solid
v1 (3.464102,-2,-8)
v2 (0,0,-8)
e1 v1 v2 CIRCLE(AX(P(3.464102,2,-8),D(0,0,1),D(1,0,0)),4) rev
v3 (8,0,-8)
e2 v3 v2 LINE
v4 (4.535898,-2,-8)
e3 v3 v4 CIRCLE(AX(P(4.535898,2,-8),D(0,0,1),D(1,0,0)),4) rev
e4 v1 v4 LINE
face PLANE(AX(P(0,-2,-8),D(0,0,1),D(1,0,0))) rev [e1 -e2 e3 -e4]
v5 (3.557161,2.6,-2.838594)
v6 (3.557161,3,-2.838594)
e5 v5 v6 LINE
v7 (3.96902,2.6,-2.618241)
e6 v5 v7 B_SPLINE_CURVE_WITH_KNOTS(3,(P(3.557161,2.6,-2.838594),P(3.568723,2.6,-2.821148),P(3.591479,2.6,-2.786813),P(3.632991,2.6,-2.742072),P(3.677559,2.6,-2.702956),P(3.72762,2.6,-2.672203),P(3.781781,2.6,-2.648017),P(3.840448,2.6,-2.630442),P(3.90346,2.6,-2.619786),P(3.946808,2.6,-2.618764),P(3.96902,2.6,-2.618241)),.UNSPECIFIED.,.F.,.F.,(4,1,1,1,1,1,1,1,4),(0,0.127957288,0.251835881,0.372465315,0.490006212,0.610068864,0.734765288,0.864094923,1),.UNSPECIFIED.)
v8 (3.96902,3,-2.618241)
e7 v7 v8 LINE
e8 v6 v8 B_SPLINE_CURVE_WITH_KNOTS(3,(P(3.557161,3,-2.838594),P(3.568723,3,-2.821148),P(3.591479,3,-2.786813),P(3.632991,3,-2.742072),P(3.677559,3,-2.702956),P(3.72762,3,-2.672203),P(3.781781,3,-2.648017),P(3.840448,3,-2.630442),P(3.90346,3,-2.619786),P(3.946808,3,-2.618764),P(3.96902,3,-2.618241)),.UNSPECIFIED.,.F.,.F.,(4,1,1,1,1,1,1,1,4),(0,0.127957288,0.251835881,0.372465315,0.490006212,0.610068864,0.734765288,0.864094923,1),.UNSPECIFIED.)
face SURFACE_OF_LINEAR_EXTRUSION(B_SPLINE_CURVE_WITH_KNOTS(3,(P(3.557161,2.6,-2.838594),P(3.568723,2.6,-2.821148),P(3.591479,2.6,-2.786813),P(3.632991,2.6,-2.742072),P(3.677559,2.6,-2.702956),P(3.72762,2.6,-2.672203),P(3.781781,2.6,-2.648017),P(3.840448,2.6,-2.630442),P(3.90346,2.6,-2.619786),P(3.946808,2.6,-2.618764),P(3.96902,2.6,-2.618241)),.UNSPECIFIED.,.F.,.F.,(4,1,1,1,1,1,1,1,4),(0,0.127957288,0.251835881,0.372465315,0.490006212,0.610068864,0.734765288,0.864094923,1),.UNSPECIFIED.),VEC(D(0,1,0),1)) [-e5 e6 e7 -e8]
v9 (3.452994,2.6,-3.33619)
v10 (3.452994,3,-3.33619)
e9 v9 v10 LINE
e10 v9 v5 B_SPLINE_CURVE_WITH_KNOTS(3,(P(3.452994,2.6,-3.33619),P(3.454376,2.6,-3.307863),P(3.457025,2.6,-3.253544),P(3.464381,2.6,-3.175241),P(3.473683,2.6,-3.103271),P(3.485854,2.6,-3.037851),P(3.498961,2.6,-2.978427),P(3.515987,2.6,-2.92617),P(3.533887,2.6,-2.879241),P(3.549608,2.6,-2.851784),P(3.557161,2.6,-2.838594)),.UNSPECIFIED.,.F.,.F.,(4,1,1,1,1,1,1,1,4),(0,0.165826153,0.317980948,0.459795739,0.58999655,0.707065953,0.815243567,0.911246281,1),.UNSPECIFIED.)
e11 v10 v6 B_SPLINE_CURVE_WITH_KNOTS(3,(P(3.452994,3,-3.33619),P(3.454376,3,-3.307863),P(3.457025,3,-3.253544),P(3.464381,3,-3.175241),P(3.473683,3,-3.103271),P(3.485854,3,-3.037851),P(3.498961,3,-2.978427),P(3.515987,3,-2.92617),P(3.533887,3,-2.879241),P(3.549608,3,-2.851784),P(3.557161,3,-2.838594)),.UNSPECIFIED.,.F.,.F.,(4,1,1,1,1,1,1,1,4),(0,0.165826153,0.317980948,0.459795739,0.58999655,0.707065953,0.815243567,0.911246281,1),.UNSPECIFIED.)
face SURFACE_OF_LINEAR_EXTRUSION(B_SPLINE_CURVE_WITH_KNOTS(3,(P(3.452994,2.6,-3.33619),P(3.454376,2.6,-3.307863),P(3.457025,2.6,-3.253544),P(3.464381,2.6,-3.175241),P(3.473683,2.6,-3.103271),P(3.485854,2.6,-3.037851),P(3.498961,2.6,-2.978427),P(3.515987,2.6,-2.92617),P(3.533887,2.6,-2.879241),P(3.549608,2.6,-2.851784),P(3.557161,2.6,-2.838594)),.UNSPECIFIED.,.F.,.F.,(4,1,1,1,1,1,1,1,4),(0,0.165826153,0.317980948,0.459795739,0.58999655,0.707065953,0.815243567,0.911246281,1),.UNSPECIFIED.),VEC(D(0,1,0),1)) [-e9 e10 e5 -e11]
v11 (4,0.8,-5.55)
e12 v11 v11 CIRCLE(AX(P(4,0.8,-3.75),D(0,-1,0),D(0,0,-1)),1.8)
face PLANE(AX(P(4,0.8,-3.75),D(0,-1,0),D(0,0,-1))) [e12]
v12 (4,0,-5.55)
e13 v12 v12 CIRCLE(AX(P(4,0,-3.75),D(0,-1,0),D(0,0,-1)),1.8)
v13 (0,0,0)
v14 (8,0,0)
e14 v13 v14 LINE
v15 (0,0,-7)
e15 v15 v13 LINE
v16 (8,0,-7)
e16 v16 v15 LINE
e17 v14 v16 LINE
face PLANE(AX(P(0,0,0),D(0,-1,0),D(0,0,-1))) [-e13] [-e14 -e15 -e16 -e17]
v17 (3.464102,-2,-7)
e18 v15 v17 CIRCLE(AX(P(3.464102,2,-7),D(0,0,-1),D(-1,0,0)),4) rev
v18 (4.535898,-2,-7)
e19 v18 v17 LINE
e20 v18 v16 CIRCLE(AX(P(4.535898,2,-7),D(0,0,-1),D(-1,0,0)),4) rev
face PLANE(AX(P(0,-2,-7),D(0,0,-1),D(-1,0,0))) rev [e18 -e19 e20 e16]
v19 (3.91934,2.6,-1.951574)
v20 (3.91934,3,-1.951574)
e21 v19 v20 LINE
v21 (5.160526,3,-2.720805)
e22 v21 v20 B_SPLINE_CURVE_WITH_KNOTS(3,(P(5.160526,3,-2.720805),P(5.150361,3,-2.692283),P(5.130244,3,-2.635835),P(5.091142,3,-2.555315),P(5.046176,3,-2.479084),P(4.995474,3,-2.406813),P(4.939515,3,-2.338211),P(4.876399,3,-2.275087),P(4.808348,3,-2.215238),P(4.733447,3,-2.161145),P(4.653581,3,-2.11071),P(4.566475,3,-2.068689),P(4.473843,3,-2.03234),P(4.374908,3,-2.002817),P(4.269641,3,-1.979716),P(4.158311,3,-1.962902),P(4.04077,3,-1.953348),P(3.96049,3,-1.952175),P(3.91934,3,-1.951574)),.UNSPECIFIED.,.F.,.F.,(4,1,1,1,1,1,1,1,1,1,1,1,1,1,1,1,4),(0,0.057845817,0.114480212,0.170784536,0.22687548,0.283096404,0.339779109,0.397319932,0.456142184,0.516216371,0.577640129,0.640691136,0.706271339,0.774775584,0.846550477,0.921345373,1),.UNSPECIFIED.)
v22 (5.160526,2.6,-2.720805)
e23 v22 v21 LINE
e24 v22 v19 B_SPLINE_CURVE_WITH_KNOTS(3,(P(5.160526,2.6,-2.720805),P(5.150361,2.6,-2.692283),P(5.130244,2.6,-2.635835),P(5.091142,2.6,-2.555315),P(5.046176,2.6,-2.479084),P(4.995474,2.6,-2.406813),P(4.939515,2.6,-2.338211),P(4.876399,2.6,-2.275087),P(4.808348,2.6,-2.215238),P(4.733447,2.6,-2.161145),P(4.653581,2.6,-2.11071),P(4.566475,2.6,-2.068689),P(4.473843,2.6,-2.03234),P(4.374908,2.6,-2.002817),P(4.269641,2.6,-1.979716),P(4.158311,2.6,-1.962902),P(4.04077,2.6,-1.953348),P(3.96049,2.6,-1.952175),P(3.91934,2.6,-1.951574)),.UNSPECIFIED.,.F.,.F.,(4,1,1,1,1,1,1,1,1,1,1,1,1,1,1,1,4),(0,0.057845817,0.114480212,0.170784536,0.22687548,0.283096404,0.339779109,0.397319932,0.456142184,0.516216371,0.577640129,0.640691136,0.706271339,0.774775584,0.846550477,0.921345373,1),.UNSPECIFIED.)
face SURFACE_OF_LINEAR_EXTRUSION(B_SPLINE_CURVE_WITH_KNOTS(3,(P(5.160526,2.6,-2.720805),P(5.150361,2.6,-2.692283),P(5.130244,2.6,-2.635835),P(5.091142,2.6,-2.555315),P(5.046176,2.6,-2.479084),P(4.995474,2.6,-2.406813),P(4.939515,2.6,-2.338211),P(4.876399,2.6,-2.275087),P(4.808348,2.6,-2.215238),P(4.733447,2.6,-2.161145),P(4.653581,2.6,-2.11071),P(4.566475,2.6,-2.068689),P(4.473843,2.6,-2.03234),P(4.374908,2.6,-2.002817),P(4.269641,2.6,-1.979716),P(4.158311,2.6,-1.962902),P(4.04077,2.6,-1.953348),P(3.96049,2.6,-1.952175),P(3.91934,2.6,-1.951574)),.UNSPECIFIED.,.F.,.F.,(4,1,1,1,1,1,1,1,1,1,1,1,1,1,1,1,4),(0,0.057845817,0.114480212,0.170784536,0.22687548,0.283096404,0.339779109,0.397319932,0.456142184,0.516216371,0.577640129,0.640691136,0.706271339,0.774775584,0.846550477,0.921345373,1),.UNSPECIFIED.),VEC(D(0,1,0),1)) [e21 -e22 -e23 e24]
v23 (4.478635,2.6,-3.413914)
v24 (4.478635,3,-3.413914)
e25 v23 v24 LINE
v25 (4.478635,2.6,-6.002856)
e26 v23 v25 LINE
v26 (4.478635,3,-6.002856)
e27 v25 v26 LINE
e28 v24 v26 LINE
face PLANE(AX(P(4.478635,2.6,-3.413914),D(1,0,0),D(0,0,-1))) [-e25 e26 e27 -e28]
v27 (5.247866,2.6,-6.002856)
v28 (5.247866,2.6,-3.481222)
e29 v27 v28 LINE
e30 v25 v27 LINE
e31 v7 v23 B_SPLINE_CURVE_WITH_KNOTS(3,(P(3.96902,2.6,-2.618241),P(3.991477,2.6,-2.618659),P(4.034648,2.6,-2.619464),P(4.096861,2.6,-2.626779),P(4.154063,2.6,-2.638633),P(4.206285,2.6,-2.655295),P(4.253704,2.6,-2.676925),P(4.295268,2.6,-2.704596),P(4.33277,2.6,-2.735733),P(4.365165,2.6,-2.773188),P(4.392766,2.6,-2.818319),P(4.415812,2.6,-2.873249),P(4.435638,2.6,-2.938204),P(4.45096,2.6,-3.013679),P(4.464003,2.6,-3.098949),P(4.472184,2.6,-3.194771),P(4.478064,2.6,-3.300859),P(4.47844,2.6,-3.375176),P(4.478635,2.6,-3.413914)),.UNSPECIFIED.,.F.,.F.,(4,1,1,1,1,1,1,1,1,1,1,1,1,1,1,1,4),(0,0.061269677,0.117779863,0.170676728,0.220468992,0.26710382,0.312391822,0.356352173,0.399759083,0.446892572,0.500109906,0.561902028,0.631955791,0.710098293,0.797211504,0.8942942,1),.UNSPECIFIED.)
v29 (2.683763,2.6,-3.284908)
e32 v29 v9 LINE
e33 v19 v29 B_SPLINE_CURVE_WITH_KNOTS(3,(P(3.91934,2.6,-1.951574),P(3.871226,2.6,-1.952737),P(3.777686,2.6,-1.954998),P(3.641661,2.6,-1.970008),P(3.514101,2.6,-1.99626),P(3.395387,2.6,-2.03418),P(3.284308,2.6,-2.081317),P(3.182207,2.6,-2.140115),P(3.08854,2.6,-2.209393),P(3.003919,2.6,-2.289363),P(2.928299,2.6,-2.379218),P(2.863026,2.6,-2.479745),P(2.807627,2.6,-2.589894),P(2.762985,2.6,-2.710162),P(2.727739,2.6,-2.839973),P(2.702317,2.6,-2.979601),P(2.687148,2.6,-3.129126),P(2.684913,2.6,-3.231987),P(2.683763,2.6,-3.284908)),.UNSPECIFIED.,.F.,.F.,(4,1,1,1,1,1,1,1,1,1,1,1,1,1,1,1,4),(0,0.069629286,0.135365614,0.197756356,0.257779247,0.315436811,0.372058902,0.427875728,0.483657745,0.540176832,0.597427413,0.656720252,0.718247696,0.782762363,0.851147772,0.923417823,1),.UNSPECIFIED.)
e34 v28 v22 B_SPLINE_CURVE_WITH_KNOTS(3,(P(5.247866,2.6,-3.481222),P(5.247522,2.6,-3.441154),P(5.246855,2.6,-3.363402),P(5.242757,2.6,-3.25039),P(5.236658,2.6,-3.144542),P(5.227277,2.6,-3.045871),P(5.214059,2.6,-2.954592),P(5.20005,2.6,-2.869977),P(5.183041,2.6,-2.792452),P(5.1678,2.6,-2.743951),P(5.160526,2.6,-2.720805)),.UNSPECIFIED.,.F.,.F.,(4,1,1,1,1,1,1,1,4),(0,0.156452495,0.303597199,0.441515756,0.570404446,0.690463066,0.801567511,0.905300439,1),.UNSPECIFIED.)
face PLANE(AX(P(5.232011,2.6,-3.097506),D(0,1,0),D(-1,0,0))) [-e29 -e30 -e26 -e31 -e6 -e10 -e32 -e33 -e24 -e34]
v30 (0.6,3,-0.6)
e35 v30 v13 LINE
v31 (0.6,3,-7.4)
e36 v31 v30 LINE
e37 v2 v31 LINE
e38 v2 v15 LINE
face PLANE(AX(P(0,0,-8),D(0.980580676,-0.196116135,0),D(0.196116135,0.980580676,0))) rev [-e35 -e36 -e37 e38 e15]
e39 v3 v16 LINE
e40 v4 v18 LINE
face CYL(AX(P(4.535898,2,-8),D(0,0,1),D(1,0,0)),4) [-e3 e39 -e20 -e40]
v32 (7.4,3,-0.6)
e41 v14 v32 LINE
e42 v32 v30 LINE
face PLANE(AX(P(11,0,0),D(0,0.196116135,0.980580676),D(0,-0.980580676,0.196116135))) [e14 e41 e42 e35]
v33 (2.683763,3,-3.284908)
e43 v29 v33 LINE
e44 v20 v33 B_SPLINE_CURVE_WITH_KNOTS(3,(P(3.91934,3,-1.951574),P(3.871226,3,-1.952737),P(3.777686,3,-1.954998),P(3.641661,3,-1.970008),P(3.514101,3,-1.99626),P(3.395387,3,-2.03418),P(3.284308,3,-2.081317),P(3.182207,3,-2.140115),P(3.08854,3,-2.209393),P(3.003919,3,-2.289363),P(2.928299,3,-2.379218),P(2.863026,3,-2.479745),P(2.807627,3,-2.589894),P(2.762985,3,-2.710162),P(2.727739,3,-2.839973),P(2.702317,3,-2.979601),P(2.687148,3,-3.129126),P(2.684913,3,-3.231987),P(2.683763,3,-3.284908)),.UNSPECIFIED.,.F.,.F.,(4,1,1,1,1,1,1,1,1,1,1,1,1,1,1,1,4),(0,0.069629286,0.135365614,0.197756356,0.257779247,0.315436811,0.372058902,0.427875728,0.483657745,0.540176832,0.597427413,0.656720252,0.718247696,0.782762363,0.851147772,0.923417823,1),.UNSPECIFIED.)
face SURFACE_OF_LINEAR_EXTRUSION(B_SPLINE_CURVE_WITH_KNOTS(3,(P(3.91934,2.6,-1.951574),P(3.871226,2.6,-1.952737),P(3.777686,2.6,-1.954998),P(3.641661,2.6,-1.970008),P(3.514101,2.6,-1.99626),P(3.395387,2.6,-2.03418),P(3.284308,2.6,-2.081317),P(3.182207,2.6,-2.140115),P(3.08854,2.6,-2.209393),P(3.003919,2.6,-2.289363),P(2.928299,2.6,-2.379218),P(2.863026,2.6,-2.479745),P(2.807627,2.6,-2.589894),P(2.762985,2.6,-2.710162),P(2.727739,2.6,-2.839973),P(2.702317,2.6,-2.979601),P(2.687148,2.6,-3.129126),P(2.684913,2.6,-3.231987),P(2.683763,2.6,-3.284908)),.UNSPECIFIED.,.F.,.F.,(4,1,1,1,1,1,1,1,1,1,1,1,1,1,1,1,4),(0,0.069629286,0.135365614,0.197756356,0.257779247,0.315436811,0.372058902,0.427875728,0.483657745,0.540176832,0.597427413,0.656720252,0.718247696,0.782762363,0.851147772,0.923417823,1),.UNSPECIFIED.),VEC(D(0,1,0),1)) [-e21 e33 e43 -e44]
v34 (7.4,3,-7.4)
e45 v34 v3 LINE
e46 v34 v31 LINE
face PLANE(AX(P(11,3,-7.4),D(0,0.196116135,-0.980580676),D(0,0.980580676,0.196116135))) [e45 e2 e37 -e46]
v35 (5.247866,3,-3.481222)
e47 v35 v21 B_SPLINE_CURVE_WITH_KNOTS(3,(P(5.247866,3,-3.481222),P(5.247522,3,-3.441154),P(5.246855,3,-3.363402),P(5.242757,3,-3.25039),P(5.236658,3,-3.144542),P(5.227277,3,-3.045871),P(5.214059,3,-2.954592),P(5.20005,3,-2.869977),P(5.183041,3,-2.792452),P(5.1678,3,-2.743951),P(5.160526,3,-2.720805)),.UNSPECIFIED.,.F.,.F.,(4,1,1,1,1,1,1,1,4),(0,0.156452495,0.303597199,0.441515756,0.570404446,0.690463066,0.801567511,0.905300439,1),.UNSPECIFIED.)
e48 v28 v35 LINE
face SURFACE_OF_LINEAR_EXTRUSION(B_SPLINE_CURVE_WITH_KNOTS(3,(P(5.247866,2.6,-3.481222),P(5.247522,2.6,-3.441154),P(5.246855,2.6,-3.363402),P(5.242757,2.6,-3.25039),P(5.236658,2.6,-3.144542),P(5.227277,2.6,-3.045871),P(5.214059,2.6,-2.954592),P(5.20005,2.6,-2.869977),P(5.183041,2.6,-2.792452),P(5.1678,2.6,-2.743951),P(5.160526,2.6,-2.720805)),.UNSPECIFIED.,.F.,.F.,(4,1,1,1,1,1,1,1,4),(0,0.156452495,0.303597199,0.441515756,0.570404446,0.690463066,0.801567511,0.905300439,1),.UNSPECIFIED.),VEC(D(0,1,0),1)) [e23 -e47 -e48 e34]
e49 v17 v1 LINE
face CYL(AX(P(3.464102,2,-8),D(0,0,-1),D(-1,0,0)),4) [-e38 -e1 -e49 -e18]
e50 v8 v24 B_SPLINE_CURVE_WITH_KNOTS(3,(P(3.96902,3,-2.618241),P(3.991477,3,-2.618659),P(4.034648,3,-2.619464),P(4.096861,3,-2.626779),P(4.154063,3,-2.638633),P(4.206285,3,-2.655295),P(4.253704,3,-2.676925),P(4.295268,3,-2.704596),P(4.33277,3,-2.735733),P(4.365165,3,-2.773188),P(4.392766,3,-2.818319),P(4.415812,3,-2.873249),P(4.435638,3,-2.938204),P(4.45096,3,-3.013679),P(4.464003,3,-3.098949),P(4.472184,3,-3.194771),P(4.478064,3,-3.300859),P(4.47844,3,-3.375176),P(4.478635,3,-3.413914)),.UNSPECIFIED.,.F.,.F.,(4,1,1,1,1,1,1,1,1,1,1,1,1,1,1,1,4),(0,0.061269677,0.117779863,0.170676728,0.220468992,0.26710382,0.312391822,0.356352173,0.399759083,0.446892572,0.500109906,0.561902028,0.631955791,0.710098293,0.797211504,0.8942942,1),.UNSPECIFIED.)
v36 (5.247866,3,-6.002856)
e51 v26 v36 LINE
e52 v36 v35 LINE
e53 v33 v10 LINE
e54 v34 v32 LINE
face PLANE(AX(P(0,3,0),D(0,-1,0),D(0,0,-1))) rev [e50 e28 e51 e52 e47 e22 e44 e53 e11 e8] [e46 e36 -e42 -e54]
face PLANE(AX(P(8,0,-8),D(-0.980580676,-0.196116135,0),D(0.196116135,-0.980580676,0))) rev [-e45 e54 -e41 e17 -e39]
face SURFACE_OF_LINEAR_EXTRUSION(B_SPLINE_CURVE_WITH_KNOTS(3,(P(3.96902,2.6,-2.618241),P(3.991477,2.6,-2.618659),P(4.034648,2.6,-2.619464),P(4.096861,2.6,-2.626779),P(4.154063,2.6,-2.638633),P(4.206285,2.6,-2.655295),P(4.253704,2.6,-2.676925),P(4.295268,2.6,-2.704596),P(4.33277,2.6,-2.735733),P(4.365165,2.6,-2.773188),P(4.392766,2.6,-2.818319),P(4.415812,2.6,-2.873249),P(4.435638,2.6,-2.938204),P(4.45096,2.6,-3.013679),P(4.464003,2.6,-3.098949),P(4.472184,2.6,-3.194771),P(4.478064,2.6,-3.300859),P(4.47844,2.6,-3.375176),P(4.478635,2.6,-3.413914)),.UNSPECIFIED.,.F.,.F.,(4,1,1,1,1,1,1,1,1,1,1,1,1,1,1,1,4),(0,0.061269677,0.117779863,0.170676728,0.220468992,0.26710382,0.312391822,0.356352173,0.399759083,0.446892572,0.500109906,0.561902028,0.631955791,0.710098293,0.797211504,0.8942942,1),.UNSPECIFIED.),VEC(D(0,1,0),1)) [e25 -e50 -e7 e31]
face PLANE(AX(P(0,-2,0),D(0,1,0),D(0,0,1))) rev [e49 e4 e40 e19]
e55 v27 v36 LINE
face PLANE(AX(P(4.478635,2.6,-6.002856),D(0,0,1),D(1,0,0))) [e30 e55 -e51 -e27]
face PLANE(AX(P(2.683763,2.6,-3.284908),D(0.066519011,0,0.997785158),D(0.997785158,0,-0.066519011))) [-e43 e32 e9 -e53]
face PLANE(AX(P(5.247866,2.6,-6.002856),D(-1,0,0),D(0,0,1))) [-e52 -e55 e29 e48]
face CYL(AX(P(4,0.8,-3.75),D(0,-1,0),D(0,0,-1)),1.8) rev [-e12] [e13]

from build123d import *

# Parameters (mm, degrees)
SKETCH1_W               = 8
SKETCH1_H               = 8
BOSS_EXTRUDE1_DEPTH     = 3
CUT_EXTRUDE1_DEPTH      = 12.704699911
CUT_EXTRUDE1_DEPTH_BACK = 12.704699911
CUT_EXTRUDE2_DEPTH      = 11
SKETCH4_R               = 1.8
CUT_EXTRUDE3_DEPTH      = 0.8
SKETCH5_W               = 8
SKETCH5_H               = 1
BOSS_EXTRUDE2_DEPTH     = 2
FILLET1_R               = 4
CUT_EXTRUDE4_DEPTH      = 0.4


with BuildPart() as part:
    # Sketch1 → Boss-Extrude1 (new body)
    with BuildSketch(Plane(origin=(0, 0, 0), x_dir=(1, 0, 0), z_dir=(0, 1, 0))):
        with Locations((4, 4)):
            Rectangle(SKETCH1_W, SKETCH1_H)
    extrude(amount=BOSS_EXTRUDE1_DEPTH)

    # Sketch2 → Cut-Extrude1 (cut, two sides: drawn at the far end of the back side and taken through both)
    with BuildSketch(Plane.XY.offset(-CUT_EXTRUDE1_DEPTH_BACK)):
        Polygon((0, 0), (0.6, 3), (0, 3), align=None)
        Polygon((8, 0), (7.4, 3), (8, 3), align=None)
    extrude(amount=CUT_EXTRUDE1_DEPTH + CUT_EXTRUDE1_DEPTH_BACK, mode=Mode.SUBTRACT)

    # Sketch3 → Cut-Extrude2 (cut)
    with BuildSketch(Plane(origin=(0, 0, 0), x_dir=(0, 0, -1), z_dir=(1, 0, 0))):
        Polygon((0, 0), (0.6, 3), (0, 3), align=None)
        Polygon((8, 3), (7.4, 3), (8, 0), align=None)
    extrude(amount=CUT_EXTRUDE2_DEPTH, mode=Mode.SUBTRACT)

    # Sketch4 → Cut-Extrude3 (cut)
    with BuildSketch(Plane.XZ):
        with Locations(Location((4, -3.75, 0), (0, 0, 270))):
            Circle(SKETCH4_R)
    extrude(amount=-CUT_EXTRUDE3_DEPTH, mode=Mode.SUBTRACT)

    # Sketch5 → Boss-Extrude2 (add)
    with BuildSketch(Plane.XZ):
        with Locations((4, -7.5)):
            Rectangle(SKETCH5_W, SKETCH5_H)
    extrude(amount=BOSS_EXTRUDE2_DEPTH)

    # Fillet1
    # the kernel refuses this fillet: 4 mm, written as the material it takes off along each edge
    with BuildSketch(Plane(origin=(8, -2, -16.660254038), x_dir=(0, 1, 0), z_dir=(0, 0, 1)), Plane(origin=(0, -2, 1.660254038), x_dir=(0, 1, 0), z_dir=(0, 0, -1))) as fillet1_piece_1:
        with BuildLine():
            CenterArc((4, 3.464101615), FILLET1_R, 180, 60)
            Line((0, 3.464101615), (-0.08, 3.464101615))
            Line((-0.08, 3.464101615), (-0.08, 0))
            Line((-0.08, 0), (0, -0.08))
            ThreePointArc((0, -0.08), (1, -0.08), (1.96, -0.069282032))
            Line((1.96, -0.069282032), (2, 0))
        make_face()
    extrude(amount=18.320508076, mode=Mode.SUBTRACT)

    # Sketch6 → Cut-Extrude4 (cut)
    with BuildSketch(Plane(origin=(0, 3, 0), x_dir=(1, 0, 0), z_dir=(0, 1, 0))):
        with BuildLine():
            Line((4.478635236, 6.002856352), (5.247866005, 6.002856352))
            Line((5.247866005, 6.002856352), (5.247866005, 3.481221736))
            add(Edge.make_bspline(
                [(5.247866005, 3.481221736), (5.247522255, 3.441153869), (5.246855206, 3.363401883), (5.242756502, 3.250390465), (5.236658321, 3.14454193), (5.227277222, 3.045871471), (5.21405872, 2.954592388), (5.200049867, 2.869976575), (5.183041427, 2.792451692), (5.167800036, 2.743951306), (5.160526262, 2.72080507)],
                knots=[0, 0, 0, 0, 1.251619961, 2.428777588, 3.532126049, 4.56323557, 5.523704531, 6.412540087, 7.242403515, 8, 8, 8, 8], degree=3))
            add(Edge.make_bspline(
                [(5.160526262, 2.72080507), (5.150361081, 2.692282601), (5.130243602, 2.635834988), (5.091141653, 2.555314881), (5.046176431, 2.479084315), (4.995474484, 2.406812938), (4.939514717, 2.338210987), (4.876399077, 2.275086649), (4.8083478, 2.215238098), (4.733446681, 2.161145289), (4.653580791, 2.110709794), (4.566475051, 2.068688963), (4.473843299, 2.032340387), (4.374908104, 2.002816628), (4.269640778, 1.979716073), (4.158311001, 1.962901894), (4.040770466, 1.95334773), (3.960490164, 1.952175274), (3.919340364, 1.9515743)],
                knots=[0, 0, 0, 0, 0.925533072, 1.831683394, 2.73255258, 3.630007683, 4.529542467, 5.436465751, 6.357118906, 7.298274949, 8.259461937, 9.242242071, 10.251058183, 11.300341426, 12.396409345, 13.544807631, 14.74152597, 16, 16, 16, 16], degree=3))
            add(Edge.make_bspline(
                [(3.919340364, 1.9515743), (3.871225528, 1.952737211), (3.777685944, 1.954998015), (3.641661475, 1.97000769), (3.514100564, 1.996260242), (3.395387048, 2.034179675), (3.284307874, 2.08131717), (3.182206561, 2.140114726), (3.088540477, 2.209392701), (3.003918711, 2.289363431), (2.928299433, 2.379218215), (2.863026475, 2.479745415), (2.80762712, 2.589893743), (2.762984692, 2.710161506), (2.727739397, 2.839972913), (2.702317462, 2.979601288), (2.687147894, 3.129126134), (2.684913172, 3.2319872), (2.683763441, 3.284907634)],
                knots=[0, 0, 0, 0, 1.114068574, 2.165849827, 3.164101702, 4.124467949, 5.046988974, 5.952942428, 6.846011651, 7.738523925, 8.642829306, 9.558838605, 10.50752403, 11.491963144, 12.524197802, 13.618364352, 14.774685164, 16, 16, 16, 16], degree=3))
            Line((2.683763441, 3.284907634), (3.45299421, 3.336189685))
            add(Edge.make_bspline(
                [(3.45299421, 3.336189685), (3.454375767, 3.307862598), (3.45702498, 3.25354382), (3.464380935, 3.175240866), (3.473682687, 3.103271277), (3.485853837, 3.037851064), (3.498960823, 2.978427444), (3.515987002, 2.926169857), (3.533886556, 2.879240769), (3.549608387, 2.851783511), (3.557160877, 2.838593531)],
                knots=[0, 0, 0, 0, 1.326609226, 2.543847584, 3.678365909, 4.719972403, 5.656527627, 6.521948534, 7.28997025, 8, 8, 8, 8], degree=3))
            add(Edge.make_bspline(
                [(3.557160877, 2.838593531), (3.56872297, 2.821148121), (3.59147861, 2.786813382), (3.632990929, 2.742071605), (3.677558537, 2.702955843), (3.727619554, 2.672203009), (3.781780527, 2.648016829), (3.840448037, 2.63044225), (3.903460331, 2.619785853), (3.946808463, 2.61876437), (3.969019851, 2.618240967)],
                knots=[0, 0, 0, 0, 1.023658308, 2.014687051, 2.979722519, 3.920049697, 4.880550909, 5.878122304, 6.912759386, 8, 8, 8, 8], degree=3))
            add(Edge.make_bspline(
                [(3.969019851, 2.618240967), (3.991477248, 2.618659453), (4.034647527, 2.619463917), (4.09686091, 2.626779219), (4.154063033, 2.638632824), (4.206285054, 2.655294856), (4.253703868, 2.676924623), (4.295268393, 2.704596166), (4.33276969, 2.735732915), (4.36516489, 2.773188264), (4.392766236, 2.818318957), (4.415812105, 2.873248962), (4.43563784, 2.938204221), (4.450960178, 3.01367855), (4.464002509, 3.098949399), (4.472183692, 3.194770716), (4.478064386, 3.300859295), (4.478439634, 3.37517575), (4.478635236, 3.413914044)],
                knots=[0, 0, 0, 0, 0.980314827, 1.884477813, 2.730827652, 3.527503874, 4.27366112, 4.998269146, 5.70163477, 6.396145331, 7.150281155, 8.001758491, 8.990432449, 10.111292654, 11.361572691, 12.75538406, 14.308707205, 16, 16, 16, 16], degree=3))
            Line((4.478635236, 3.413914044), (4.478635236, 6.002856352))
        make_face()
    extrude(amount=-CUT_EXTRUDE4_DEPTH, mode=Mode.SUBTRACT)


solid = part.part
